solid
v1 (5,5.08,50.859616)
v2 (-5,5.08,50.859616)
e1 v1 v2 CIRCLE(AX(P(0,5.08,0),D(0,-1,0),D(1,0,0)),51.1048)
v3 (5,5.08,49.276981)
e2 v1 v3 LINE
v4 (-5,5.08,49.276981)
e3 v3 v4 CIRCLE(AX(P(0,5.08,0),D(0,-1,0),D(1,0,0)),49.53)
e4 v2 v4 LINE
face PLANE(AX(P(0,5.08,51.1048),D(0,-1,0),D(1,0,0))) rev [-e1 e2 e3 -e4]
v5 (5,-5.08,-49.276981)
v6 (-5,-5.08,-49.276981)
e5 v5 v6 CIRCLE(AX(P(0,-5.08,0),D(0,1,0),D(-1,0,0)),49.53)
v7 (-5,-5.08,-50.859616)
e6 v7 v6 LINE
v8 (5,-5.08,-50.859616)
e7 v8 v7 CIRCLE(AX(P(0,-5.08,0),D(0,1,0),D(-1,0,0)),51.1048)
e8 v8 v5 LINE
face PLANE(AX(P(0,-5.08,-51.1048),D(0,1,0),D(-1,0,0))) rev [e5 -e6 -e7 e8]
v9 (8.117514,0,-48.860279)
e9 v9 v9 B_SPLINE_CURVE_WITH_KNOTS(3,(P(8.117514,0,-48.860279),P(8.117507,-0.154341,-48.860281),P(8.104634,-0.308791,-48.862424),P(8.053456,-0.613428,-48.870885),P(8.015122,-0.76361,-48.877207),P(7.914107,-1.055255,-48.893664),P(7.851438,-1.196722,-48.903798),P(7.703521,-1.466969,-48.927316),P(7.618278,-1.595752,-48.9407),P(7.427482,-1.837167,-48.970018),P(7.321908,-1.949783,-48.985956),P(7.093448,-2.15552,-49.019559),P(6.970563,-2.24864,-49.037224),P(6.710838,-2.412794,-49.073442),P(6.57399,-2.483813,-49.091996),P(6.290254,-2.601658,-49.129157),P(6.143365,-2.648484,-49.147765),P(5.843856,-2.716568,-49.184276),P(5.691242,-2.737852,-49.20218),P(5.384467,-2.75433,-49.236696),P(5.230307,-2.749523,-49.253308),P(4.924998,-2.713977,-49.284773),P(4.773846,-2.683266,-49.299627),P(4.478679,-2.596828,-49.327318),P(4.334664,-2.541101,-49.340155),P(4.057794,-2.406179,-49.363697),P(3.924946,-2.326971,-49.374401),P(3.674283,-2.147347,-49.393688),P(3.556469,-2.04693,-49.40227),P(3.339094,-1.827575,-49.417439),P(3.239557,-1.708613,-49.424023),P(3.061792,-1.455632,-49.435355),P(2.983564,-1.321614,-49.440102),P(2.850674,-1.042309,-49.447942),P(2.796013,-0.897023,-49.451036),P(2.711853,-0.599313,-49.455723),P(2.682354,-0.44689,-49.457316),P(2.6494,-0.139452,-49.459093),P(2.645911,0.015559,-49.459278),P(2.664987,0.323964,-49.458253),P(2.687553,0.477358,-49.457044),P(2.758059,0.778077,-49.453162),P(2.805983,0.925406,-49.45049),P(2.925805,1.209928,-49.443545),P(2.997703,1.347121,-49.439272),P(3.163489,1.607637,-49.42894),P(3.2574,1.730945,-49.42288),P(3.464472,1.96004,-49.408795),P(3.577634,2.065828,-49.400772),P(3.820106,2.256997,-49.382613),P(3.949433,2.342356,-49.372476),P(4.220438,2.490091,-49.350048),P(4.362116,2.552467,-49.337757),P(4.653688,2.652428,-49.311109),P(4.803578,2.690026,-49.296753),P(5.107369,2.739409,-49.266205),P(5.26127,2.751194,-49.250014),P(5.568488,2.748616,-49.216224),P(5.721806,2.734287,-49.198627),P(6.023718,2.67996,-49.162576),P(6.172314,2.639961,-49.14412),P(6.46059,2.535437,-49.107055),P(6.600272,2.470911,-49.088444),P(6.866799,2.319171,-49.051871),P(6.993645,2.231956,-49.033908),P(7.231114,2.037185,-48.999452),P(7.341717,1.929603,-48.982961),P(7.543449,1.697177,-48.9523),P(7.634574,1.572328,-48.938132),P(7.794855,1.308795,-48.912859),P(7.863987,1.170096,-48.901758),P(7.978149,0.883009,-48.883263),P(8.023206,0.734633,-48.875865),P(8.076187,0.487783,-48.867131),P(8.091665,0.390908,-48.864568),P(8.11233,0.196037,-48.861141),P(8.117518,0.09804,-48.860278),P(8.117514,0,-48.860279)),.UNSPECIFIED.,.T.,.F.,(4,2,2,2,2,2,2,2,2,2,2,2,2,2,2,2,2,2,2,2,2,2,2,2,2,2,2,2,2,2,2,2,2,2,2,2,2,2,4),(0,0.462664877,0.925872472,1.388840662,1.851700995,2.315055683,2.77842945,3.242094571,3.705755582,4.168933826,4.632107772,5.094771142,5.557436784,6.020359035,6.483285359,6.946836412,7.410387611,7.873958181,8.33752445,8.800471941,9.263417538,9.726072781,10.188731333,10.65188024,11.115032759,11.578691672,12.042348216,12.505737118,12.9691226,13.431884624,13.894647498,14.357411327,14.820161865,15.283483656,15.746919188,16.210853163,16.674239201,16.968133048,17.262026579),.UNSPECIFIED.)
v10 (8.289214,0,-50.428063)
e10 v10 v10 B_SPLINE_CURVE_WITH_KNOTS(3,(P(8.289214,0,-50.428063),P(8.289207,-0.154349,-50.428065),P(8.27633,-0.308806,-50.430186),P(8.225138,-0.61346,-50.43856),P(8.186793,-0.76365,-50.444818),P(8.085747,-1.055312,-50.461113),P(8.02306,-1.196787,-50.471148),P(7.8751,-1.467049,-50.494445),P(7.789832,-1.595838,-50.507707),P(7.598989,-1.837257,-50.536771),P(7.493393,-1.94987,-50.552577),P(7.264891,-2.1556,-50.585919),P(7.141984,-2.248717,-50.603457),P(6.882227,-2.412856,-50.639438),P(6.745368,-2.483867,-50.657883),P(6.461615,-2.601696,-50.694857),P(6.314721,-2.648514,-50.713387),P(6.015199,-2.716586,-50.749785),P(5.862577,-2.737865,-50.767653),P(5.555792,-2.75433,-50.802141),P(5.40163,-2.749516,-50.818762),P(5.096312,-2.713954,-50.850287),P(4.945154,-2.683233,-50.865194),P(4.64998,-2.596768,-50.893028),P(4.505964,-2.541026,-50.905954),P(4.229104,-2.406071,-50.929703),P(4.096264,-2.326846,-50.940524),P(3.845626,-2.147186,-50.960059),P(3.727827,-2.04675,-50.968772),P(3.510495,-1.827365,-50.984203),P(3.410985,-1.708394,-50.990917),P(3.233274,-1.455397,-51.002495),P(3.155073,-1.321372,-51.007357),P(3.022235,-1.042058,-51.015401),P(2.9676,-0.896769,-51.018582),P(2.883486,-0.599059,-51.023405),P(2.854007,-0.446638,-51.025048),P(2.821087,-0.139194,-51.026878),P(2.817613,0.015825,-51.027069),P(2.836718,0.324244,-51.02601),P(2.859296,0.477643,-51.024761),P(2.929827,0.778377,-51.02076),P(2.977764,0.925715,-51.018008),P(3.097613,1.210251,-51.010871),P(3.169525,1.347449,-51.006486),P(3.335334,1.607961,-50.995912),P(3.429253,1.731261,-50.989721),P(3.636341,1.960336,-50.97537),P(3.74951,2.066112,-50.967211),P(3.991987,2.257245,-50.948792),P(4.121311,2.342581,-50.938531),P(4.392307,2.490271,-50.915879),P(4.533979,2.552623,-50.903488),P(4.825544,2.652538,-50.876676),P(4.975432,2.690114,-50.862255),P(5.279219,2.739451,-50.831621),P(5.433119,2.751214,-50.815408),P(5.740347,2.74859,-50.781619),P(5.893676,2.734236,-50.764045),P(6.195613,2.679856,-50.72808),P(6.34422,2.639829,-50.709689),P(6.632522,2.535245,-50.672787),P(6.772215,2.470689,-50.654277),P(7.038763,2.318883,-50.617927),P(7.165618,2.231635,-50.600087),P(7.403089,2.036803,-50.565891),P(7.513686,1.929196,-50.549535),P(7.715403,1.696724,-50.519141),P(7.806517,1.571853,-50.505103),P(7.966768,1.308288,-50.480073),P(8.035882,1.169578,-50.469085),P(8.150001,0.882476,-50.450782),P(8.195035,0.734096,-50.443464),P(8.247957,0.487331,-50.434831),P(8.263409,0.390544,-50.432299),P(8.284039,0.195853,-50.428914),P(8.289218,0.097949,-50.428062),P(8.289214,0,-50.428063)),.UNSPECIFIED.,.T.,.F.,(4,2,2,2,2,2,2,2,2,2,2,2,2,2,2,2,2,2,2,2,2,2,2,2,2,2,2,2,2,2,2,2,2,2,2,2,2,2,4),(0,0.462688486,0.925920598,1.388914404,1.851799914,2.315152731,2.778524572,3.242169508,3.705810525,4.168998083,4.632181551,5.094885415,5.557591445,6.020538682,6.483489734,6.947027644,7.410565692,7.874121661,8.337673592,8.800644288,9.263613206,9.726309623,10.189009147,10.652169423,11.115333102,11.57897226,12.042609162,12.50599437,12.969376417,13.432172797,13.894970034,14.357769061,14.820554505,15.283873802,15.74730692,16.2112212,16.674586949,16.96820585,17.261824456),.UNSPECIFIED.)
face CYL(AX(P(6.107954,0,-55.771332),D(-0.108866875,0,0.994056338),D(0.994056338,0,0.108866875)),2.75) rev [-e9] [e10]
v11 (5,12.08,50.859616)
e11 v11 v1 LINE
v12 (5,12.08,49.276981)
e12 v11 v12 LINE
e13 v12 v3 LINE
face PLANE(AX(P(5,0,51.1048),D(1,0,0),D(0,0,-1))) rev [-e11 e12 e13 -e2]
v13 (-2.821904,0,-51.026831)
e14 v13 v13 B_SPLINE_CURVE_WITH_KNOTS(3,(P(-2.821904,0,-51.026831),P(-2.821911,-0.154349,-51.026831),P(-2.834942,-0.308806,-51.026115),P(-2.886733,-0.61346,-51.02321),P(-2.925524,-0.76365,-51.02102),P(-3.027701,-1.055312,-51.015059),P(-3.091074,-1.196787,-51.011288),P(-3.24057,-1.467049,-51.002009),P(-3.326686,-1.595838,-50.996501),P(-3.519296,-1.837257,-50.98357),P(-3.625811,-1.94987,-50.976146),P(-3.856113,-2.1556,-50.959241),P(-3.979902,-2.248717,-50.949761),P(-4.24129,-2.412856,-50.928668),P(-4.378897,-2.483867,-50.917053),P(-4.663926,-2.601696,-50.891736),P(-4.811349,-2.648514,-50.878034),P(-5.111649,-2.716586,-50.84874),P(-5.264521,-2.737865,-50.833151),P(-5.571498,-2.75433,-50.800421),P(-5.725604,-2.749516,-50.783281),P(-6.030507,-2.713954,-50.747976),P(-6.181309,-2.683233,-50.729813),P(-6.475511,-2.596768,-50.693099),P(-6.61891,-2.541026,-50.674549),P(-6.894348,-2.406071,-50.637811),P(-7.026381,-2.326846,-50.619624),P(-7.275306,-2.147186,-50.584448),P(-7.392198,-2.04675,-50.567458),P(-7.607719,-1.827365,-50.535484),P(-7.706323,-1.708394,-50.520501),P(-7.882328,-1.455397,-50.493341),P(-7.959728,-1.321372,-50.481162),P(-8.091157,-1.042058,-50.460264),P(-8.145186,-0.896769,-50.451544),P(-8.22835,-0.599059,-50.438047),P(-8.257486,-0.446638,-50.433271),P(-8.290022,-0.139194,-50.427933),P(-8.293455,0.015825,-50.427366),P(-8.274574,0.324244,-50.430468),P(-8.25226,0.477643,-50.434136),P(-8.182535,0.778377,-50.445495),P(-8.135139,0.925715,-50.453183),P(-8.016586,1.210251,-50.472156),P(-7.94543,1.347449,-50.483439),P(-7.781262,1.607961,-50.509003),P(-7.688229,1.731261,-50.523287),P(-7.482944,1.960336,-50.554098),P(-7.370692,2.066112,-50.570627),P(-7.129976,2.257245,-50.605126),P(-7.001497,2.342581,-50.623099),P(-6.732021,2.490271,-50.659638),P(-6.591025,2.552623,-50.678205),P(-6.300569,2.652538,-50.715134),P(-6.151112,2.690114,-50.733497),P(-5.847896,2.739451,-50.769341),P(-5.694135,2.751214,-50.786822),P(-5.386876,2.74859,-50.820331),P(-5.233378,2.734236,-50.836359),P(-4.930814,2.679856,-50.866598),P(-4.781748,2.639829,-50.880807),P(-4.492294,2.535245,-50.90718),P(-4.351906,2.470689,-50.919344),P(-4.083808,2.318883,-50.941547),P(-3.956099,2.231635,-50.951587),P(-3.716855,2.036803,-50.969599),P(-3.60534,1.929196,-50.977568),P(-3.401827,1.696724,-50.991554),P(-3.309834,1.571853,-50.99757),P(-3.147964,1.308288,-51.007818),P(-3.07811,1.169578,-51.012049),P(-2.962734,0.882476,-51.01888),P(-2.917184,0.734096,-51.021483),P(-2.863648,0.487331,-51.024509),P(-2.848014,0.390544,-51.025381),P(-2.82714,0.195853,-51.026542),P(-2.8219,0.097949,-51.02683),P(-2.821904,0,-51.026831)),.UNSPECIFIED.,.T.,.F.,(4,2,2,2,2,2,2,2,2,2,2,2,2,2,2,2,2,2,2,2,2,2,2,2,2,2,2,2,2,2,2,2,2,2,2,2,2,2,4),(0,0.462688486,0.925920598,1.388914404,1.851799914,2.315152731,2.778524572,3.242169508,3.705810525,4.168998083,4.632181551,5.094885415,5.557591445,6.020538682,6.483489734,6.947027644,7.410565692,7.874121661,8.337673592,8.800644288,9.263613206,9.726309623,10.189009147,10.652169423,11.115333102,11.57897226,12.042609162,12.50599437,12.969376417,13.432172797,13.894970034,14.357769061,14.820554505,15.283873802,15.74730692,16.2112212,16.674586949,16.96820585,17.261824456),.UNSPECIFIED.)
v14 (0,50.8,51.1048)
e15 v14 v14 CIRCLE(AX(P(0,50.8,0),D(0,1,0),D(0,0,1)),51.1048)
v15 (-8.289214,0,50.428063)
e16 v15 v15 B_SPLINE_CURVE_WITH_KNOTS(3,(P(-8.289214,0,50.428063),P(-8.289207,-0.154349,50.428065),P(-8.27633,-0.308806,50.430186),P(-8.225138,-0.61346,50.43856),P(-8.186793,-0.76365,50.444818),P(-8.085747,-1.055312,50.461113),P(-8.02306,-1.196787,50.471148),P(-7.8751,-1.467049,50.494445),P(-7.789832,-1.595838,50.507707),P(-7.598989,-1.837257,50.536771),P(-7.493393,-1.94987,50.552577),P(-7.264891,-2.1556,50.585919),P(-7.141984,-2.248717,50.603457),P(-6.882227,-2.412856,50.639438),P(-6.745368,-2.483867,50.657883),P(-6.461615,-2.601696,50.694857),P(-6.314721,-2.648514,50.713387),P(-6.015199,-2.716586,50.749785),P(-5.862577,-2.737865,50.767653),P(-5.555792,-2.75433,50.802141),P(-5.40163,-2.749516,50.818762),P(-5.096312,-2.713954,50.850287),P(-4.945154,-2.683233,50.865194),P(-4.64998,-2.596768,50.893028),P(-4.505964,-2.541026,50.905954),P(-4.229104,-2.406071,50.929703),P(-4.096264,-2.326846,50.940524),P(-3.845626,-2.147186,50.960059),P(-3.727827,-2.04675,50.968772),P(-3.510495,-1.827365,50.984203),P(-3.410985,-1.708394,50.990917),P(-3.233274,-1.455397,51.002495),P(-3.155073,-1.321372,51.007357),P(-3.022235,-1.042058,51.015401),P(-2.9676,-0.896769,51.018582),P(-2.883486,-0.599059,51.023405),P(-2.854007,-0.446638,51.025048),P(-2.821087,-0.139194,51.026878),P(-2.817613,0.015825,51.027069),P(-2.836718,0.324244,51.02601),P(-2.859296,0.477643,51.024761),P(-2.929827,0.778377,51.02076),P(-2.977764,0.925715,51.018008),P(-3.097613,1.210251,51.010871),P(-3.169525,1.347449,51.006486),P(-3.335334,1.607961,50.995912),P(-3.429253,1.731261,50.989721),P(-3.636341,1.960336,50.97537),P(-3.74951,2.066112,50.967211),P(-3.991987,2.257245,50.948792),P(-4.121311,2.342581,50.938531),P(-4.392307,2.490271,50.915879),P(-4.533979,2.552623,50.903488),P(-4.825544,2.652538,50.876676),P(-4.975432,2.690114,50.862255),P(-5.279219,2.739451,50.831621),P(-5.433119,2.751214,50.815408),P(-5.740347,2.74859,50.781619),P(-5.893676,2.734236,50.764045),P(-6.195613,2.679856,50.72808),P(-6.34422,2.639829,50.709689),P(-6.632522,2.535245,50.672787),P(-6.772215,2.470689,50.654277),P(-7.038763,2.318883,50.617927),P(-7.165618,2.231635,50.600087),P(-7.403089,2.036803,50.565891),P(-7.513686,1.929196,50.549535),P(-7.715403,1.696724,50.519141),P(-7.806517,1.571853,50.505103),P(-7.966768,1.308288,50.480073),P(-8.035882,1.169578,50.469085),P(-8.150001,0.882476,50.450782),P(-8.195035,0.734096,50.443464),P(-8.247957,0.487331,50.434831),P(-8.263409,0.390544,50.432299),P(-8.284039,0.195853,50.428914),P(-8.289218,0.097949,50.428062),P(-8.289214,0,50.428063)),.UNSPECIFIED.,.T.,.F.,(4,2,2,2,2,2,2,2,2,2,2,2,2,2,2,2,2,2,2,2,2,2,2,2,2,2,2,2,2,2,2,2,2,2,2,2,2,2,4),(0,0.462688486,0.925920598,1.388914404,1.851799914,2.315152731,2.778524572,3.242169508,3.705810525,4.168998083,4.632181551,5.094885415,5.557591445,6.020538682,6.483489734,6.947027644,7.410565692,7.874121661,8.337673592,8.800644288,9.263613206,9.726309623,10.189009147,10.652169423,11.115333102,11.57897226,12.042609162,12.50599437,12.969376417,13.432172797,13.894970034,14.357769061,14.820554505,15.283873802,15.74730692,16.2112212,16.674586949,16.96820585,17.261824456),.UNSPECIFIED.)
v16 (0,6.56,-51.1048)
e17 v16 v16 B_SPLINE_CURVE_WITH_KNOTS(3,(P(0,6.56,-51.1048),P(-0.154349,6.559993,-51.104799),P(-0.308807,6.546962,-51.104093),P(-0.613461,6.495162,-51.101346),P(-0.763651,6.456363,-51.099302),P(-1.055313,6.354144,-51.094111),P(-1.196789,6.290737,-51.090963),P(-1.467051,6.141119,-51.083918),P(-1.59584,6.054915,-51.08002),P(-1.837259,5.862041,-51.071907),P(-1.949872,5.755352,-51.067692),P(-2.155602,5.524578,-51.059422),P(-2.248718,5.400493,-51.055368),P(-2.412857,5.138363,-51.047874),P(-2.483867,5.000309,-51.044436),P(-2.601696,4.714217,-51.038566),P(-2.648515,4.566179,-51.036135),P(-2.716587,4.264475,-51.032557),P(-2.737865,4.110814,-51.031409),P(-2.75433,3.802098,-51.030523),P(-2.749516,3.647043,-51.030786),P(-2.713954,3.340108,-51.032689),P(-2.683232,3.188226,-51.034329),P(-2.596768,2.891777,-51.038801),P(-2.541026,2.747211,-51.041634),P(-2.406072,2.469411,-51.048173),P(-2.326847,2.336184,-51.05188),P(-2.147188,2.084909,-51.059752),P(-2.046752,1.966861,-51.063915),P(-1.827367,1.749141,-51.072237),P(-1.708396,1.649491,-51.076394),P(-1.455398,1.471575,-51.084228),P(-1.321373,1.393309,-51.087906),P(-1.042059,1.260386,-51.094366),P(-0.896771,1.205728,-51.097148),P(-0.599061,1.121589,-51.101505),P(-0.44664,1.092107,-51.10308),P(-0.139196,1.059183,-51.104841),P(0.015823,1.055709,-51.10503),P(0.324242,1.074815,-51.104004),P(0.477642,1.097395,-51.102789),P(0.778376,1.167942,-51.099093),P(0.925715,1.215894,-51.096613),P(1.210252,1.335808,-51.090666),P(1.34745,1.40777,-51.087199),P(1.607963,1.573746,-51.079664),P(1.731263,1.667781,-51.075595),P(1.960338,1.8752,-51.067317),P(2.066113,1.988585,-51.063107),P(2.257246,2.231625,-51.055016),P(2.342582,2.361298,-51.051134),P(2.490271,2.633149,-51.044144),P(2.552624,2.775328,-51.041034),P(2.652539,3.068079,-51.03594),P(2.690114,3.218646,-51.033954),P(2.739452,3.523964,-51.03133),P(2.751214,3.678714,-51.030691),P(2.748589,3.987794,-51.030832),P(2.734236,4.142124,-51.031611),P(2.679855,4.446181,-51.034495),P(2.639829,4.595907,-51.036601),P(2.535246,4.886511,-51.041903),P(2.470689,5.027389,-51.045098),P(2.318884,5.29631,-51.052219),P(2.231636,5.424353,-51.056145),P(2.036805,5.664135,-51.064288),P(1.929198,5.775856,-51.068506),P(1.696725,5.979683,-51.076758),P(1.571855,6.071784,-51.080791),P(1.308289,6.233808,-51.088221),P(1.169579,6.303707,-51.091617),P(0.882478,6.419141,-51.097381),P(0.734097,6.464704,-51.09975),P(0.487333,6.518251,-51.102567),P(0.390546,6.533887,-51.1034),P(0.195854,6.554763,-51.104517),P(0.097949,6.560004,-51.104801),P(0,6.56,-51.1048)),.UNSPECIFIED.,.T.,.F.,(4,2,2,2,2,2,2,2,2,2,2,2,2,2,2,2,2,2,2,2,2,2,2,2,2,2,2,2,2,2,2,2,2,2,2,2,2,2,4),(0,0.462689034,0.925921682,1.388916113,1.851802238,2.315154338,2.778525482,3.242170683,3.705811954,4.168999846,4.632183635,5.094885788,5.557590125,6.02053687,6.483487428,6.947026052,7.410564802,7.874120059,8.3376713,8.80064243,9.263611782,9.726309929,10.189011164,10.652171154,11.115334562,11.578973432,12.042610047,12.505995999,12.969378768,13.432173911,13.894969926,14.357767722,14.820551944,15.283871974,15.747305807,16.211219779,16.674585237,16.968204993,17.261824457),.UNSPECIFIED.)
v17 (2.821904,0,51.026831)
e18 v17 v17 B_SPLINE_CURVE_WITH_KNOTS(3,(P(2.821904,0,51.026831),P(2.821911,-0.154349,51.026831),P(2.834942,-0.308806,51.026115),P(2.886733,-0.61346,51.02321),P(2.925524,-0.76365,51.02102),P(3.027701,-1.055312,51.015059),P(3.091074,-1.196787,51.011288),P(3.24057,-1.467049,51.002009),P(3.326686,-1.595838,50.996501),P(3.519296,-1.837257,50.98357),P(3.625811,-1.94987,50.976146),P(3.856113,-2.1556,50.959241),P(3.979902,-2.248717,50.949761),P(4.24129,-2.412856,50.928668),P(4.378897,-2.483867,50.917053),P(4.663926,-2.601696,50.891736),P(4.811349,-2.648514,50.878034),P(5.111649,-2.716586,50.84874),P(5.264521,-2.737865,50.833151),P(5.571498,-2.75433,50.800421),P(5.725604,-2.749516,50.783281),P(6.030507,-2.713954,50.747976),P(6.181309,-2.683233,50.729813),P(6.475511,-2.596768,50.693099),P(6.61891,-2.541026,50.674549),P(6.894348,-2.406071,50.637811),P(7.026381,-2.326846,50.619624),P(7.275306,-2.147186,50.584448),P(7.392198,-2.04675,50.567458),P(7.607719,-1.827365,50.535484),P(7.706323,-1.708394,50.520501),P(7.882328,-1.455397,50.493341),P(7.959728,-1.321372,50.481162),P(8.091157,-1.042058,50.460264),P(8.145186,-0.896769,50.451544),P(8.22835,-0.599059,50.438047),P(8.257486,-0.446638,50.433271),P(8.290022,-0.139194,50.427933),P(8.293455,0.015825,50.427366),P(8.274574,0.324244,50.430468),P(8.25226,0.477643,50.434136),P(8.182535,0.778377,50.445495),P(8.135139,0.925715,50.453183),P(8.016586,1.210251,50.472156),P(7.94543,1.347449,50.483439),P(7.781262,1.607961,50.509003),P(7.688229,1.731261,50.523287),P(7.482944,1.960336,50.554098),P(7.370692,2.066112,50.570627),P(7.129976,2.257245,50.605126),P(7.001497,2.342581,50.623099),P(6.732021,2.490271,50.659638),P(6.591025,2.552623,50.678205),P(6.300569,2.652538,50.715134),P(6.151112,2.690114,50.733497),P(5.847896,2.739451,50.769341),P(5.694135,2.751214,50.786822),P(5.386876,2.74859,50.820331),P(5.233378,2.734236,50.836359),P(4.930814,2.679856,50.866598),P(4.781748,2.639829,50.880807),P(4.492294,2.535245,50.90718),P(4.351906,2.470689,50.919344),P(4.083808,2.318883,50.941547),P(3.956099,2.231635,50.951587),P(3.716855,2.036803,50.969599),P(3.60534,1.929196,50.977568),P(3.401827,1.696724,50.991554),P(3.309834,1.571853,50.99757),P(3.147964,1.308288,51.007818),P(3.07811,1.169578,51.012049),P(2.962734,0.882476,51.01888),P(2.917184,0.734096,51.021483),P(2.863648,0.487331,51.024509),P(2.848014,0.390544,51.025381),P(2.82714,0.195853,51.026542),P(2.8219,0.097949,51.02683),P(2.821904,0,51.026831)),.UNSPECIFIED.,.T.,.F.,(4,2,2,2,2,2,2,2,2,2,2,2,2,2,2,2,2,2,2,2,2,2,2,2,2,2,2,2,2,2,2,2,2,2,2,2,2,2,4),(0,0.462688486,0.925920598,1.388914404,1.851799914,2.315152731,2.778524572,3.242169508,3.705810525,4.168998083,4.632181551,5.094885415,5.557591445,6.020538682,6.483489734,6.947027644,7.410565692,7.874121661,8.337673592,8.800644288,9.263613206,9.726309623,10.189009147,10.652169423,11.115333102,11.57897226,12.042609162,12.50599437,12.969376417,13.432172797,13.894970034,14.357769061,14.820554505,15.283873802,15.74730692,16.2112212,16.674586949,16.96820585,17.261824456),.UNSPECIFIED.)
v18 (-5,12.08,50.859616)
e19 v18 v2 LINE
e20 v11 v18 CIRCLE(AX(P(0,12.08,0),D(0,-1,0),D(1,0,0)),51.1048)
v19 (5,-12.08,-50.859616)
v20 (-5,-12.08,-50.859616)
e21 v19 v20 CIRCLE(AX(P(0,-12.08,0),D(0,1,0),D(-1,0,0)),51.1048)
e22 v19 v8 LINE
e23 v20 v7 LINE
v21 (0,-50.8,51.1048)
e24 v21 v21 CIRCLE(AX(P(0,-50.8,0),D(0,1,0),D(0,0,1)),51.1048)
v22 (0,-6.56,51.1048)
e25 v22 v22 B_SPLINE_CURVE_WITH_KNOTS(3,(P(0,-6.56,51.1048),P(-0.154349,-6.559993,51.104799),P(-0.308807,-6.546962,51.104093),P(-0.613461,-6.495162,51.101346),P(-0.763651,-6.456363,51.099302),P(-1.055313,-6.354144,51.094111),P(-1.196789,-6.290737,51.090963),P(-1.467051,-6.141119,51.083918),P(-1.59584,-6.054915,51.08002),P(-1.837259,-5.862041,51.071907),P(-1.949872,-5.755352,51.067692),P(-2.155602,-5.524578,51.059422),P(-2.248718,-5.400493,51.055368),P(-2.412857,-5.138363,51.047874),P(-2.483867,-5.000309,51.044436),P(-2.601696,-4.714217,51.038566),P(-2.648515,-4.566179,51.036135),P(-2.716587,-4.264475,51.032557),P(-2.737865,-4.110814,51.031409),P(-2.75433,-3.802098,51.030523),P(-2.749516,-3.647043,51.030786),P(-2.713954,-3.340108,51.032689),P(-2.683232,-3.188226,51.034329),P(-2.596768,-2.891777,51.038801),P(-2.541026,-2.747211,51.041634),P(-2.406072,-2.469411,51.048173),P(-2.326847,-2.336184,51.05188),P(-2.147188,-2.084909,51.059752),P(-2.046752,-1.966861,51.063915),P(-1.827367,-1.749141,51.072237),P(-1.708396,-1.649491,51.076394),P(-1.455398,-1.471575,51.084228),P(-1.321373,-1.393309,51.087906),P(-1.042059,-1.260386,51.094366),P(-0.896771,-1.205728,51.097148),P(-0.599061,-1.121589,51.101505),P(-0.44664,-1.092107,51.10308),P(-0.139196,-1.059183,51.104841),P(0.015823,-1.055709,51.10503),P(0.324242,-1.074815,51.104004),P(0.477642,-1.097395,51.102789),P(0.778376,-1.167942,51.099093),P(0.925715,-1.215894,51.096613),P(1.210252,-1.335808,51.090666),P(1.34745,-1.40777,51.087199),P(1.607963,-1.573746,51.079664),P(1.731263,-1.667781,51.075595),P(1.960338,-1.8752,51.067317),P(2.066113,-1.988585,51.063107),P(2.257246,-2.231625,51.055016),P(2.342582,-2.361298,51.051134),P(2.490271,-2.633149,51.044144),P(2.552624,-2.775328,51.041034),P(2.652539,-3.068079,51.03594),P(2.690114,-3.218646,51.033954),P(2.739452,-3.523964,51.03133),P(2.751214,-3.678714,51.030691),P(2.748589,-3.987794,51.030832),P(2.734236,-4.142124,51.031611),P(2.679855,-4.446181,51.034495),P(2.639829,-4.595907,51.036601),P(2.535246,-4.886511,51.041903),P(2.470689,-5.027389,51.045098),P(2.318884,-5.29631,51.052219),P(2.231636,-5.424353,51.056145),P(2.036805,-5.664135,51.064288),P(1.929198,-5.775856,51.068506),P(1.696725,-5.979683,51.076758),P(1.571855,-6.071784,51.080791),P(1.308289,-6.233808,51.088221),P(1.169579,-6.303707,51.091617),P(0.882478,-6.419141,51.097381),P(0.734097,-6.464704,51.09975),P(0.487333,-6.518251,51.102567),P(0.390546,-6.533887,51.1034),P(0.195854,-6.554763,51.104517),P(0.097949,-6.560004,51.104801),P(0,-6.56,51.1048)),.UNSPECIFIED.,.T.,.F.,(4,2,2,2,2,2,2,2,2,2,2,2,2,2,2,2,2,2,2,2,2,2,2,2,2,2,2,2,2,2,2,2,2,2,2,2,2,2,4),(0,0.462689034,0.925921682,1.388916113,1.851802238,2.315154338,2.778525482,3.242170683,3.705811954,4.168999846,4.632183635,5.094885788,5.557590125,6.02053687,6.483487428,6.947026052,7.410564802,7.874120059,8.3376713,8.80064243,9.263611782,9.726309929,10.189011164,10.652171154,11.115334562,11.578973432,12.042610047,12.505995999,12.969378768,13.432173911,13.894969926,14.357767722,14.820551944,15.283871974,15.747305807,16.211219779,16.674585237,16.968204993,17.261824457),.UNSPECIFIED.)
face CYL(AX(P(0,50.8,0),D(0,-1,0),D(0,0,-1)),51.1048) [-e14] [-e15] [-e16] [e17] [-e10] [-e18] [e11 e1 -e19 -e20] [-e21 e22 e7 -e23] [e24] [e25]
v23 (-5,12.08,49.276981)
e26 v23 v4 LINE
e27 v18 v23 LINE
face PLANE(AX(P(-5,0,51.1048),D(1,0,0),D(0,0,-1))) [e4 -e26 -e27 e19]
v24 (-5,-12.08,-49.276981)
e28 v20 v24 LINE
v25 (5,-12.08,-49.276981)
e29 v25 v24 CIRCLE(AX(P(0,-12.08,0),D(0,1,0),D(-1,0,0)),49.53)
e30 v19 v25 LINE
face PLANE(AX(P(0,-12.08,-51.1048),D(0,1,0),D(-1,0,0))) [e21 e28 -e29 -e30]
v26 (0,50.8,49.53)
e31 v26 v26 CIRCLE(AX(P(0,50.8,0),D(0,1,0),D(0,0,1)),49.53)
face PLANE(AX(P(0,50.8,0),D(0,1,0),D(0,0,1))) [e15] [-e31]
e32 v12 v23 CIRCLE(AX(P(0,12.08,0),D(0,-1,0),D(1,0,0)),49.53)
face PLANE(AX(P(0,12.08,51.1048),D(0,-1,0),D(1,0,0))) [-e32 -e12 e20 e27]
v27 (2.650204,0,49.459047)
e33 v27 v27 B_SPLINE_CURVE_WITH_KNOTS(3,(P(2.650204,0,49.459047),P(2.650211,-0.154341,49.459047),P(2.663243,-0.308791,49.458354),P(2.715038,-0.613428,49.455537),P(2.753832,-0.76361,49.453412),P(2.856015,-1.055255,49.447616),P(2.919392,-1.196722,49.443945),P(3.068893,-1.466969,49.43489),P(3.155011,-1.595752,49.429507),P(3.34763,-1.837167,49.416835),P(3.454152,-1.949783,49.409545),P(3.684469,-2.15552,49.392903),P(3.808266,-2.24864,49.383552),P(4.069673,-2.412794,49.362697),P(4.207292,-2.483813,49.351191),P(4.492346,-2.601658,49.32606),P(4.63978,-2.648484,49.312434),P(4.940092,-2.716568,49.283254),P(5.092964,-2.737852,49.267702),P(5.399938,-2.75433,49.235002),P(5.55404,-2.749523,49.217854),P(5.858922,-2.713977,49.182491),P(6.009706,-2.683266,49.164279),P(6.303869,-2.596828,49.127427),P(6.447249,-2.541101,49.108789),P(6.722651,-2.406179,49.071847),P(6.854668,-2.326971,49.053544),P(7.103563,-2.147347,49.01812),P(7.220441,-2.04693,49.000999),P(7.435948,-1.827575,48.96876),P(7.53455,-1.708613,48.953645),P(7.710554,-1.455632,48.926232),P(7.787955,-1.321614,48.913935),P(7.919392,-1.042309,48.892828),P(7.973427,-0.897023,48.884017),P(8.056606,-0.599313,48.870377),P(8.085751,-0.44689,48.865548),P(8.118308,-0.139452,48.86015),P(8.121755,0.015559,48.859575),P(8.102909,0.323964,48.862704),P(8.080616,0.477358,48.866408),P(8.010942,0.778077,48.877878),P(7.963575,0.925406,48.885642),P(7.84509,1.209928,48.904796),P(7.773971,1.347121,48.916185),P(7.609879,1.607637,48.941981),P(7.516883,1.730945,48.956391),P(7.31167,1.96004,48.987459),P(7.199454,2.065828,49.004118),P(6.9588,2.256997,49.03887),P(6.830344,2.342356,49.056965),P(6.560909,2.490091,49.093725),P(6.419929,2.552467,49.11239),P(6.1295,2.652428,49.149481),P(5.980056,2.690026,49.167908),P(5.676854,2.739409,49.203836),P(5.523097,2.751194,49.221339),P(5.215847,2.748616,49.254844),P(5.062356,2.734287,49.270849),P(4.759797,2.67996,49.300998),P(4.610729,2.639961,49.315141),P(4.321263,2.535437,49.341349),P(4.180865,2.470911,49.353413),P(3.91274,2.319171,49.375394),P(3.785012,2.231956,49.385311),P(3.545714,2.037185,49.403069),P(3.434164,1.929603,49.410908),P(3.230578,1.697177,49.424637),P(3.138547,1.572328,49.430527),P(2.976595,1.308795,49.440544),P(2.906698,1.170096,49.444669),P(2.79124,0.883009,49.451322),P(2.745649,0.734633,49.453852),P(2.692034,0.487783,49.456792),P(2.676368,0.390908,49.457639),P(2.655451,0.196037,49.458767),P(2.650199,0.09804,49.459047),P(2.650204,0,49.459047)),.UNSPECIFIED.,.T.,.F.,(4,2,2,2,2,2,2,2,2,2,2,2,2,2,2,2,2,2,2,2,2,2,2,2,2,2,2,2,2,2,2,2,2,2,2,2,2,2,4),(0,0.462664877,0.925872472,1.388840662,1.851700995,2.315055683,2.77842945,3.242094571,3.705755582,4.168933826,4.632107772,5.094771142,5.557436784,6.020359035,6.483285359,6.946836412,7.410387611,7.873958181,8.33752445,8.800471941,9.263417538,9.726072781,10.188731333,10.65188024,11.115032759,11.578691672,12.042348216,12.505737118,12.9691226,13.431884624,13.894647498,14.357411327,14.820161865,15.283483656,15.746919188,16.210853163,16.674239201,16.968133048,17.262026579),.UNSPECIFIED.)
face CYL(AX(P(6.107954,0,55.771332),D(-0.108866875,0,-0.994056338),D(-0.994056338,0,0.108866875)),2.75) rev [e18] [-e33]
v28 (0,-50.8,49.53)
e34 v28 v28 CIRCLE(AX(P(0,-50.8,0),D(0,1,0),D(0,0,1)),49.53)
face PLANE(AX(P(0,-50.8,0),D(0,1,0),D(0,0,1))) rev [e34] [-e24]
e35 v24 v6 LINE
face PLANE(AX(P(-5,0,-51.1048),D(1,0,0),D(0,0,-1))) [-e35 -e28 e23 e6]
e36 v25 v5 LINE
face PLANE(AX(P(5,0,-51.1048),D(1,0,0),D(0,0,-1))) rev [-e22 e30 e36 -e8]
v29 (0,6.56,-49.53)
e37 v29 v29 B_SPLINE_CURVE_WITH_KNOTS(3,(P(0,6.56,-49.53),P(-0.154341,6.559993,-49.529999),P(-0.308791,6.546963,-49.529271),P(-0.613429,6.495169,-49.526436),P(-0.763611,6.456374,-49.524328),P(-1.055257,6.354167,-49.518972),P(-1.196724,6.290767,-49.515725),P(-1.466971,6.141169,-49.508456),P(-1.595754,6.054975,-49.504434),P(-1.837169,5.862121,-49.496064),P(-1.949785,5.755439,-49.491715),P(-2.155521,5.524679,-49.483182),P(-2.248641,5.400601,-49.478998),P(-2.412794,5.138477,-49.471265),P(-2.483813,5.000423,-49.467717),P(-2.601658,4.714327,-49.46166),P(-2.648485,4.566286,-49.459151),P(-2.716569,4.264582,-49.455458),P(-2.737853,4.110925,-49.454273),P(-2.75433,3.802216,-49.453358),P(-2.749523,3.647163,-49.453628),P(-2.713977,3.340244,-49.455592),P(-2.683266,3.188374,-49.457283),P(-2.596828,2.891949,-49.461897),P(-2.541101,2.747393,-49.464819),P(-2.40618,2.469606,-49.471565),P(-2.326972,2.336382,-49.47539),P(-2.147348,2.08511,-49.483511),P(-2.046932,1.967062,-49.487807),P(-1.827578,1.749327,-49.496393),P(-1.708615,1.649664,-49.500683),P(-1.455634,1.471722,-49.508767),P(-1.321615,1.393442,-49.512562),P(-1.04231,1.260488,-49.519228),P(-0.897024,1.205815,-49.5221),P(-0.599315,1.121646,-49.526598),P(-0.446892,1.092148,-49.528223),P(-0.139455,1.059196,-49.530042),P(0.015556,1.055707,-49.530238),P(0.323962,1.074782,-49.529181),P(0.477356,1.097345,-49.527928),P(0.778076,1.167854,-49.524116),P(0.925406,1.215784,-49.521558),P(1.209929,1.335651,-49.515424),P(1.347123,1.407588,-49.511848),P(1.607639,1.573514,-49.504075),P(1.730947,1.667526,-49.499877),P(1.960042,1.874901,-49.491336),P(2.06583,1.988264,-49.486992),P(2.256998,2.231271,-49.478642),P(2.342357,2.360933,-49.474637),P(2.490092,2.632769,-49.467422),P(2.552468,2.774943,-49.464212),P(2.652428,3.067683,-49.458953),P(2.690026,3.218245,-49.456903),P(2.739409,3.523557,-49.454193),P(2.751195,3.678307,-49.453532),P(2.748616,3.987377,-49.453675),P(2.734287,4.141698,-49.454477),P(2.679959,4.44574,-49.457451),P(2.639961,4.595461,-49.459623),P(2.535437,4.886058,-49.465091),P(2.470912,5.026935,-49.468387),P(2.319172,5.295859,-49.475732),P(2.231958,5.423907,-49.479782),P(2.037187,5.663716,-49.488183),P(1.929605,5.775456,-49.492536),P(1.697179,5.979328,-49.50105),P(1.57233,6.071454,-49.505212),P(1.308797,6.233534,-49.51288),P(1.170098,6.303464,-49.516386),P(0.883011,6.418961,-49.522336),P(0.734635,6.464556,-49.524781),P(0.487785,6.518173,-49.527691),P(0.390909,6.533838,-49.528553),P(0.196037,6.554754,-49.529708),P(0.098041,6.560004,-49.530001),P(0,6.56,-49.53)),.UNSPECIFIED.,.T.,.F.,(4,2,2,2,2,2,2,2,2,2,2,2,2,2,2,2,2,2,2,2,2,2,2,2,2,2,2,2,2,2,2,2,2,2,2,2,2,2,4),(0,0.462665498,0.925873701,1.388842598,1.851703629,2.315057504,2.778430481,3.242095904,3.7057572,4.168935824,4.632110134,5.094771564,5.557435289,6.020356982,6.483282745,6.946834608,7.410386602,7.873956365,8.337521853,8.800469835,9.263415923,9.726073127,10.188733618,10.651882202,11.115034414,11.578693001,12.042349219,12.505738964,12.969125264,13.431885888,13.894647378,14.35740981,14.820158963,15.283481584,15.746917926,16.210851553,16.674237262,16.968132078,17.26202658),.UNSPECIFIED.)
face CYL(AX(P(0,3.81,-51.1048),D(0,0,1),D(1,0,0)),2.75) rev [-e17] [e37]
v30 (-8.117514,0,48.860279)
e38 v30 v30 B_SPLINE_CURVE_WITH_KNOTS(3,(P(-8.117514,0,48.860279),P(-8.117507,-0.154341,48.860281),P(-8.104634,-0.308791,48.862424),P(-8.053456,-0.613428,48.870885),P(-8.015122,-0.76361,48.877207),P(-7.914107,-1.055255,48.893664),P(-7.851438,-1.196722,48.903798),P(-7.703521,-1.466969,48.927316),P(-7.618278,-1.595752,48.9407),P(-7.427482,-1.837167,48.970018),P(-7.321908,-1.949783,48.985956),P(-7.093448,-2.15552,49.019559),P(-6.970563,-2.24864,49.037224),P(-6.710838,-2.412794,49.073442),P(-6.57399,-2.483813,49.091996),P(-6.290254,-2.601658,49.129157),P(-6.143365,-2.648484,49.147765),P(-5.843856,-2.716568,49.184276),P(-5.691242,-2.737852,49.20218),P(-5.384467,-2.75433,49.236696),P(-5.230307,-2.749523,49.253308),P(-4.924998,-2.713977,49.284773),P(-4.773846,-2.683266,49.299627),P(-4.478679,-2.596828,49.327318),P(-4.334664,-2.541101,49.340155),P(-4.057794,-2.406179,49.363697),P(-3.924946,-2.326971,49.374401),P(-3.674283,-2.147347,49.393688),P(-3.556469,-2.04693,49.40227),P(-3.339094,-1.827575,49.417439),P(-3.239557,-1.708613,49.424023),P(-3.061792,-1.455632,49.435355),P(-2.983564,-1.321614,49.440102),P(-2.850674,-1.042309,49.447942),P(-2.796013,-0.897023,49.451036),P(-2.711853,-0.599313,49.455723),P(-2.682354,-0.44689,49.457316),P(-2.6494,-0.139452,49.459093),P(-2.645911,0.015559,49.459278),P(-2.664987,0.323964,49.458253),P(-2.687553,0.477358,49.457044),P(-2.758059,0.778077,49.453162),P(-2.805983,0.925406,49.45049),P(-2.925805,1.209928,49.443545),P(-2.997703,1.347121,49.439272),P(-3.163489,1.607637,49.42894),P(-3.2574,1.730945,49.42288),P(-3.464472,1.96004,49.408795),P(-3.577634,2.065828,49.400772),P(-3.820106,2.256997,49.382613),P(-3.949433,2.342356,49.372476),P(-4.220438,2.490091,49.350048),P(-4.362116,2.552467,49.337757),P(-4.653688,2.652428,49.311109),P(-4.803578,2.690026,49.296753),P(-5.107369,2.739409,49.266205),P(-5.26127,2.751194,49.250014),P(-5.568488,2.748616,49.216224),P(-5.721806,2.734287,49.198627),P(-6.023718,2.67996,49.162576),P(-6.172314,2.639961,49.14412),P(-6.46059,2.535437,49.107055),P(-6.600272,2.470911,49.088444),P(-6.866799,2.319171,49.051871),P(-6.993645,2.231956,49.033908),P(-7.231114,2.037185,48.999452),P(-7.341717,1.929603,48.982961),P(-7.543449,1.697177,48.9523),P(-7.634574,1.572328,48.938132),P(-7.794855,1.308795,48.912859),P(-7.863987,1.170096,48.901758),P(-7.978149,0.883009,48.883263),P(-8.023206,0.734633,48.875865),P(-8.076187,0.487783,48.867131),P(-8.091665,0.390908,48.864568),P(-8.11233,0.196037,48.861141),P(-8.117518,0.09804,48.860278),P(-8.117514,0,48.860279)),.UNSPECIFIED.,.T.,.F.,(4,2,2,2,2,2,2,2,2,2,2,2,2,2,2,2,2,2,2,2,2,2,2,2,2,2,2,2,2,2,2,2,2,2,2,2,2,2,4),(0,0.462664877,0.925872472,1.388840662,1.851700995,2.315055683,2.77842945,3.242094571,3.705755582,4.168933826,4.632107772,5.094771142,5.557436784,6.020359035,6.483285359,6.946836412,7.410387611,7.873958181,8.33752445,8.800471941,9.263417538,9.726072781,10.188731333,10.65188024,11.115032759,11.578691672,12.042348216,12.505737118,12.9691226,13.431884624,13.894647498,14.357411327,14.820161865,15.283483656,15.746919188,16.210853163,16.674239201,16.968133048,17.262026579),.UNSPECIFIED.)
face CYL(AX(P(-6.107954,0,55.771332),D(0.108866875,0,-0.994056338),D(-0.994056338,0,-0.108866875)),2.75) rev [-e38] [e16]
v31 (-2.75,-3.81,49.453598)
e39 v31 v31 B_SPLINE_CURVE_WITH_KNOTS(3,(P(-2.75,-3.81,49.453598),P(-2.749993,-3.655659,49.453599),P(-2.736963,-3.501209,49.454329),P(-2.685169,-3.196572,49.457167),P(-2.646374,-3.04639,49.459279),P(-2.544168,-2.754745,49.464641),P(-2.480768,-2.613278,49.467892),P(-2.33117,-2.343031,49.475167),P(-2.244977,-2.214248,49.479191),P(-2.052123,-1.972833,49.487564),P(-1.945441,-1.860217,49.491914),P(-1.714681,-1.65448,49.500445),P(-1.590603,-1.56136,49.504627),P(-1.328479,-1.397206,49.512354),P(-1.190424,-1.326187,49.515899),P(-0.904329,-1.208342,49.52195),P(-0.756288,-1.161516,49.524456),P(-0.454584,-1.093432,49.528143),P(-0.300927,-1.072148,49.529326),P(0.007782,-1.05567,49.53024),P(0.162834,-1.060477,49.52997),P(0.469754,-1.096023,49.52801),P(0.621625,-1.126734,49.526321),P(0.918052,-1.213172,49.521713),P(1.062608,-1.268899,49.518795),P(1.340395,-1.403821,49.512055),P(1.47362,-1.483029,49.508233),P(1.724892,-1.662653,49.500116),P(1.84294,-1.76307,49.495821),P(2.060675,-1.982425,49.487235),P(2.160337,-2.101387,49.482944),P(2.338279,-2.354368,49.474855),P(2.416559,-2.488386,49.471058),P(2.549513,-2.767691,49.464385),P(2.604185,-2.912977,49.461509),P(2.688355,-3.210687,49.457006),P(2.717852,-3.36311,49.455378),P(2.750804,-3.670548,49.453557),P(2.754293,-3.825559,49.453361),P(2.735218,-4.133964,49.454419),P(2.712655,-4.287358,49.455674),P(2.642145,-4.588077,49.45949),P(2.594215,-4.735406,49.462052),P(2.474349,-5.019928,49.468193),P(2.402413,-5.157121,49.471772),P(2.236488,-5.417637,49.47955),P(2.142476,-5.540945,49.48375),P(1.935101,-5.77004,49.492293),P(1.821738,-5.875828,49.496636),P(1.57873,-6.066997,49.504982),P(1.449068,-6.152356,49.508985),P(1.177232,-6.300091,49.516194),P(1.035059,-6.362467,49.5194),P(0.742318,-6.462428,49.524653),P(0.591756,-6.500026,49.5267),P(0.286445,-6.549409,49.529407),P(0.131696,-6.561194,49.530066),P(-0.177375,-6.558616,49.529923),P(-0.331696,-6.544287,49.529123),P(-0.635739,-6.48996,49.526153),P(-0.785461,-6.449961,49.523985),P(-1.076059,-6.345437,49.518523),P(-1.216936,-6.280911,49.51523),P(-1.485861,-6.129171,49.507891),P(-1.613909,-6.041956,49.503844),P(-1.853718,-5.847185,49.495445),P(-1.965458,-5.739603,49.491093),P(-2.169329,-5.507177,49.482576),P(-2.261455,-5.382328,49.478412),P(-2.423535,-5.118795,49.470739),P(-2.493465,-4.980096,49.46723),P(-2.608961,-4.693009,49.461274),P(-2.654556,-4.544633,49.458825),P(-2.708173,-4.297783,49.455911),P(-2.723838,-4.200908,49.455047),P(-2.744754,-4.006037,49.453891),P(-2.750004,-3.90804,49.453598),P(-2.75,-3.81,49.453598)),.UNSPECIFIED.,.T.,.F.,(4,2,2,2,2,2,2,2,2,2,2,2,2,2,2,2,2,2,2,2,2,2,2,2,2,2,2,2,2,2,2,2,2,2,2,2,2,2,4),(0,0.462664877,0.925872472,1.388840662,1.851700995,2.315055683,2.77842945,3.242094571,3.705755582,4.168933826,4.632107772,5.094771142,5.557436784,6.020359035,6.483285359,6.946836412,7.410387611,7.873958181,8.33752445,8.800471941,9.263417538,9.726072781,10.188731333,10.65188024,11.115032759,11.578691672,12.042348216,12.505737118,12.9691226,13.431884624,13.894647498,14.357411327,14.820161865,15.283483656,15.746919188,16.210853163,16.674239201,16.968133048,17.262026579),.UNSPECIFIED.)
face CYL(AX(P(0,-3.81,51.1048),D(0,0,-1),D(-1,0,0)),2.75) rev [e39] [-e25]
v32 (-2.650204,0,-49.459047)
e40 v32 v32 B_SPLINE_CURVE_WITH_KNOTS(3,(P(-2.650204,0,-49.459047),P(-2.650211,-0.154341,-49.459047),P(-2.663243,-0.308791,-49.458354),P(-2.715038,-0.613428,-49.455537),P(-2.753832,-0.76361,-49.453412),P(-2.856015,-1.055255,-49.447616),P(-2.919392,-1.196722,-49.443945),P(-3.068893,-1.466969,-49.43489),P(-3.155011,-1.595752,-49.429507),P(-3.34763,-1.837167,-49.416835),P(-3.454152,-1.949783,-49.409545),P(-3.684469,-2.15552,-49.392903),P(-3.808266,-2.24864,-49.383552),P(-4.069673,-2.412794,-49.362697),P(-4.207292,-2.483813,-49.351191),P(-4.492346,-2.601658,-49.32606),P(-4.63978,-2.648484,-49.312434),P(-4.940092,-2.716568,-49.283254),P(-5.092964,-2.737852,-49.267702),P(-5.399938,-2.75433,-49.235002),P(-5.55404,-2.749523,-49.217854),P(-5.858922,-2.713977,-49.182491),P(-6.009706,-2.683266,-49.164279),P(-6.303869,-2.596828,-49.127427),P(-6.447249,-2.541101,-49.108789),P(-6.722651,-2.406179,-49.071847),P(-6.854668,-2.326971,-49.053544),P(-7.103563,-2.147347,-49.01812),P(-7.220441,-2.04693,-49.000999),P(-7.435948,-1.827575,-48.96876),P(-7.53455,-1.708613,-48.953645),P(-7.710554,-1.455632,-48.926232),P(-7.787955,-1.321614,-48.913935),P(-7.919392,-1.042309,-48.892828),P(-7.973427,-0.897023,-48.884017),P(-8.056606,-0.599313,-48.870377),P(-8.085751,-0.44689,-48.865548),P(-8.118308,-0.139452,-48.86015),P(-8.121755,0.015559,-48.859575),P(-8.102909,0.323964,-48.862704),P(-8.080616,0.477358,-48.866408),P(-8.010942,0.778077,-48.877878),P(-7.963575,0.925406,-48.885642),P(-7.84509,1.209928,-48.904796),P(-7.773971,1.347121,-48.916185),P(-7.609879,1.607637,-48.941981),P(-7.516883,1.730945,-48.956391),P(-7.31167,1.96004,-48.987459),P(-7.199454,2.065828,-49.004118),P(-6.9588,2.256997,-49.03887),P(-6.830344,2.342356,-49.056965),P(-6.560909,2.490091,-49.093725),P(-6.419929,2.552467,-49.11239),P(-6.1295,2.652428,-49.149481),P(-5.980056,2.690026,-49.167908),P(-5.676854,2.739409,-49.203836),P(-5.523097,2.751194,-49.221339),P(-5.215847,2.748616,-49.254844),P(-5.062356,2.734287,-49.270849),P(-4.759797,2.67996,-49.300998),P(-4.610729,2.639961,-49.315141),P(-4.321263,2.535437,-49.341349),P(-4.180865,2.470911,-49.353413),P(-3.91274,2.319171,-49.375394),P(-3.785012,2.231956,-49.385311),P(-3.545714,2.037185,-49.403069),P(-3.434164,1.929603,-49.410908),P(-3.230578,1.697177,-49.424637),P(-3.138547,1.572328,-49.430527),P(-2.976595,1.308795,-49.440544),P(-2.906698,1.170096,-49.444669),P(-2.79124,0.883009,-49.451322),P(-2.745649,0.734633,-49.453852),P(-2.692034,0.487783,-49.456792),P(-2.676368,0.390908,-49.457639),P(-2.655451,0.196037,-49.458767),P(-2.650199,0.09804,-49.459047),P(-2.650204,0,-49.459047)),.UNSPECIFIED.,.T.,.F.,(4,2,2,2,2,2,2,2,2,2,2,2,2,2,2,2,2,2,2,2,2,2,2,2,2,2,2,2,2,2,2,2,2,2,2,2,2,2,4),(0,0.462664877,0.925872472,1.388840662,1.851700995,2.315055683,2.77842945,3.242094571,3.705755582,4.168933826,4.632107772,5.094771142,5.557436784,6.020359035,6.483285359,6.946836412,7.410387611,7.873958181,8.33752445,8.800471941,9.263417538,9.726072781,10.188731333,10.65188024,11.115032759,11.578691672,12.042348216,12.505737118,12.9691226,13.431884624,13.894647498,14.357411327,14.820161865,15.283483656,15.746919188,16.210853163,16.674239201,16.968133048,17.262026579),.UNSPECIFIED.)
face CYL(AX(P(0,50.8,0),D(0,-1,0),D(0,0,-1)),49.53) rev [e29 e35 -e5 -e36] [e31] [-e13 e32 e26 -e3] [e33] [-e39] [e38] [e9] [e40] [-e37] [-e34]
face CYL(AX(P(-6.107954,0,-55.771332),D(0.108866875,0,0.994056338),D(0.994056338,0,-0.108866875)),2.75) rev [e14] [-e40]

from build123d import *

# Parameters (mm, degrees)
SKETCH1_R               = 51.1048
SKETCH1_R_2             = 49.53
BOSS_EXTRUDE1_DEPTH     = 50.8
CUT_SWEEP1_START        = -51.104800053
CUT_SWEEP1_OUTLINE_R    = 2.749999961
CUT_SWEEP1_DEPTH        = 1.651201698
MIRROR2_START           = -51.104800053
MIRROR2_COPY_1_SKETCH_R = 2.749999961
MIRROR2_COPY_1_DEPTH    = 1.651201698
SKETCH18_R              = 2.749999961
SKETCH18_W              = 10.000000066
SKETCH18_H              = 6.99999997
CUT_EXTRUDE1_DEPTH      = 89.340484472
SKETCH18_3_R            = 2.749999961
SKETCH18_3_W            = 10.000000066
SKETCH18_3_H            = 6.99999997
CUT_EXTRUDE2_DEPTH      = 89.340484472


# Read off the part's stored shape, not the designer's step: Cut-Sweep1
with BuildPart() as part:
    # Sketch1 → Boss-Extrude1 (new, symmetric)
    with BuildSketch(Plane(origin=(0, 0, 0), x_dir=(1, 0, 0), z_dir=(0, 1, 0))):
        with Locations(Location((0, 0, 0), (0, 0, 270))):
            Circle(SKETCH1_R)
        with Locations(Location((0, 0, 0), (0, 0, 270))):
            Circle(SKETCH1_R_2, mode=Mode.SUBTRACT)
    extrude(amount=BOSS_EXTRUDE1_DEPTH, both=True)

    # Cut-Sweep1 outline → Cut-Sweep1 (cut)
    with BuildSketch(Plane(origin=(0, 0, 0), x_dir=(0.9940563382223202, 0, -0.10886687485195803), z_dir=(0.10886687485195805, 0, 0.9940563382223203)).offset(CUT_SWEEP1_START)):
        Circle(CUT_SWEEP1_OUTLINE_R)
    cut_sweep1 = extrude(amount=CUT_SWEEP1_DEPTH, mode=Mode.SUBTRACT)

    # Mirror1: Cut-Sweep1 across plane
    add(cut_sweep1.mirror(Plane(origin=(0, 0, 0), x_dir=(0, 0, 1), z_dir=(1, 0, 0))), mode=Mode.SUBTRACT)

    # Mirror2: Cut-Sweep1 across plane
    add(cut_sweep1.mirror(Plane.XY), mode=Mode.SUBTRACT)

    # Mirror2 copy 1 sketch → Mirror2 copy 1 (cut)
    with BuildSketch(Plane(origin=(0, 0, 0), x_dir=(-0.9940563382223202, 0, 0.10886687485195803), z_dir=(-0.10886687485195805, 0, -0.9940563382223203)).offset(MIRROR2_START)):
        Circle(MIRROR2_COPY_1_SKETCH_R)
    extrude(amount=MIRROR2_COPY_1_DEPTH, mode=Mode.SUBTRACT)

    # Sketch18 → Cut-Extrude1 (cut, through all)
    with BuildSketch(Plane.XY):
        with Locations(Location((0, 3.81, 0), (0, 0, 90))):
            Circle(SKETCH18_R)
        with Locations((0, -8.579999985)):
            Rectangle(SKETCH18_W, SKETCH18_H)
    extrude(amount=-CUT_EXTRUDE1_DEPTH, mode=Mode.SUBTRACT)

    # Sketch18<3> → Cut-Extrude2 (cut, through all)
    with BuildSketch(Plane.XY):
        with Locations(Location((0, -3.81, 0), (0, 0, 89.999999966))):
            Circle(SKETCH18_3_R)
        with Locations((0, 8.579999985)):
            Rectangle(SKETCH18_3_W, SKETCH18_3_H)
    extrude(amount=CUT_EXTRUDE2_DEPTH, mode=Mode.SUBTRACT)


solid = part.part
